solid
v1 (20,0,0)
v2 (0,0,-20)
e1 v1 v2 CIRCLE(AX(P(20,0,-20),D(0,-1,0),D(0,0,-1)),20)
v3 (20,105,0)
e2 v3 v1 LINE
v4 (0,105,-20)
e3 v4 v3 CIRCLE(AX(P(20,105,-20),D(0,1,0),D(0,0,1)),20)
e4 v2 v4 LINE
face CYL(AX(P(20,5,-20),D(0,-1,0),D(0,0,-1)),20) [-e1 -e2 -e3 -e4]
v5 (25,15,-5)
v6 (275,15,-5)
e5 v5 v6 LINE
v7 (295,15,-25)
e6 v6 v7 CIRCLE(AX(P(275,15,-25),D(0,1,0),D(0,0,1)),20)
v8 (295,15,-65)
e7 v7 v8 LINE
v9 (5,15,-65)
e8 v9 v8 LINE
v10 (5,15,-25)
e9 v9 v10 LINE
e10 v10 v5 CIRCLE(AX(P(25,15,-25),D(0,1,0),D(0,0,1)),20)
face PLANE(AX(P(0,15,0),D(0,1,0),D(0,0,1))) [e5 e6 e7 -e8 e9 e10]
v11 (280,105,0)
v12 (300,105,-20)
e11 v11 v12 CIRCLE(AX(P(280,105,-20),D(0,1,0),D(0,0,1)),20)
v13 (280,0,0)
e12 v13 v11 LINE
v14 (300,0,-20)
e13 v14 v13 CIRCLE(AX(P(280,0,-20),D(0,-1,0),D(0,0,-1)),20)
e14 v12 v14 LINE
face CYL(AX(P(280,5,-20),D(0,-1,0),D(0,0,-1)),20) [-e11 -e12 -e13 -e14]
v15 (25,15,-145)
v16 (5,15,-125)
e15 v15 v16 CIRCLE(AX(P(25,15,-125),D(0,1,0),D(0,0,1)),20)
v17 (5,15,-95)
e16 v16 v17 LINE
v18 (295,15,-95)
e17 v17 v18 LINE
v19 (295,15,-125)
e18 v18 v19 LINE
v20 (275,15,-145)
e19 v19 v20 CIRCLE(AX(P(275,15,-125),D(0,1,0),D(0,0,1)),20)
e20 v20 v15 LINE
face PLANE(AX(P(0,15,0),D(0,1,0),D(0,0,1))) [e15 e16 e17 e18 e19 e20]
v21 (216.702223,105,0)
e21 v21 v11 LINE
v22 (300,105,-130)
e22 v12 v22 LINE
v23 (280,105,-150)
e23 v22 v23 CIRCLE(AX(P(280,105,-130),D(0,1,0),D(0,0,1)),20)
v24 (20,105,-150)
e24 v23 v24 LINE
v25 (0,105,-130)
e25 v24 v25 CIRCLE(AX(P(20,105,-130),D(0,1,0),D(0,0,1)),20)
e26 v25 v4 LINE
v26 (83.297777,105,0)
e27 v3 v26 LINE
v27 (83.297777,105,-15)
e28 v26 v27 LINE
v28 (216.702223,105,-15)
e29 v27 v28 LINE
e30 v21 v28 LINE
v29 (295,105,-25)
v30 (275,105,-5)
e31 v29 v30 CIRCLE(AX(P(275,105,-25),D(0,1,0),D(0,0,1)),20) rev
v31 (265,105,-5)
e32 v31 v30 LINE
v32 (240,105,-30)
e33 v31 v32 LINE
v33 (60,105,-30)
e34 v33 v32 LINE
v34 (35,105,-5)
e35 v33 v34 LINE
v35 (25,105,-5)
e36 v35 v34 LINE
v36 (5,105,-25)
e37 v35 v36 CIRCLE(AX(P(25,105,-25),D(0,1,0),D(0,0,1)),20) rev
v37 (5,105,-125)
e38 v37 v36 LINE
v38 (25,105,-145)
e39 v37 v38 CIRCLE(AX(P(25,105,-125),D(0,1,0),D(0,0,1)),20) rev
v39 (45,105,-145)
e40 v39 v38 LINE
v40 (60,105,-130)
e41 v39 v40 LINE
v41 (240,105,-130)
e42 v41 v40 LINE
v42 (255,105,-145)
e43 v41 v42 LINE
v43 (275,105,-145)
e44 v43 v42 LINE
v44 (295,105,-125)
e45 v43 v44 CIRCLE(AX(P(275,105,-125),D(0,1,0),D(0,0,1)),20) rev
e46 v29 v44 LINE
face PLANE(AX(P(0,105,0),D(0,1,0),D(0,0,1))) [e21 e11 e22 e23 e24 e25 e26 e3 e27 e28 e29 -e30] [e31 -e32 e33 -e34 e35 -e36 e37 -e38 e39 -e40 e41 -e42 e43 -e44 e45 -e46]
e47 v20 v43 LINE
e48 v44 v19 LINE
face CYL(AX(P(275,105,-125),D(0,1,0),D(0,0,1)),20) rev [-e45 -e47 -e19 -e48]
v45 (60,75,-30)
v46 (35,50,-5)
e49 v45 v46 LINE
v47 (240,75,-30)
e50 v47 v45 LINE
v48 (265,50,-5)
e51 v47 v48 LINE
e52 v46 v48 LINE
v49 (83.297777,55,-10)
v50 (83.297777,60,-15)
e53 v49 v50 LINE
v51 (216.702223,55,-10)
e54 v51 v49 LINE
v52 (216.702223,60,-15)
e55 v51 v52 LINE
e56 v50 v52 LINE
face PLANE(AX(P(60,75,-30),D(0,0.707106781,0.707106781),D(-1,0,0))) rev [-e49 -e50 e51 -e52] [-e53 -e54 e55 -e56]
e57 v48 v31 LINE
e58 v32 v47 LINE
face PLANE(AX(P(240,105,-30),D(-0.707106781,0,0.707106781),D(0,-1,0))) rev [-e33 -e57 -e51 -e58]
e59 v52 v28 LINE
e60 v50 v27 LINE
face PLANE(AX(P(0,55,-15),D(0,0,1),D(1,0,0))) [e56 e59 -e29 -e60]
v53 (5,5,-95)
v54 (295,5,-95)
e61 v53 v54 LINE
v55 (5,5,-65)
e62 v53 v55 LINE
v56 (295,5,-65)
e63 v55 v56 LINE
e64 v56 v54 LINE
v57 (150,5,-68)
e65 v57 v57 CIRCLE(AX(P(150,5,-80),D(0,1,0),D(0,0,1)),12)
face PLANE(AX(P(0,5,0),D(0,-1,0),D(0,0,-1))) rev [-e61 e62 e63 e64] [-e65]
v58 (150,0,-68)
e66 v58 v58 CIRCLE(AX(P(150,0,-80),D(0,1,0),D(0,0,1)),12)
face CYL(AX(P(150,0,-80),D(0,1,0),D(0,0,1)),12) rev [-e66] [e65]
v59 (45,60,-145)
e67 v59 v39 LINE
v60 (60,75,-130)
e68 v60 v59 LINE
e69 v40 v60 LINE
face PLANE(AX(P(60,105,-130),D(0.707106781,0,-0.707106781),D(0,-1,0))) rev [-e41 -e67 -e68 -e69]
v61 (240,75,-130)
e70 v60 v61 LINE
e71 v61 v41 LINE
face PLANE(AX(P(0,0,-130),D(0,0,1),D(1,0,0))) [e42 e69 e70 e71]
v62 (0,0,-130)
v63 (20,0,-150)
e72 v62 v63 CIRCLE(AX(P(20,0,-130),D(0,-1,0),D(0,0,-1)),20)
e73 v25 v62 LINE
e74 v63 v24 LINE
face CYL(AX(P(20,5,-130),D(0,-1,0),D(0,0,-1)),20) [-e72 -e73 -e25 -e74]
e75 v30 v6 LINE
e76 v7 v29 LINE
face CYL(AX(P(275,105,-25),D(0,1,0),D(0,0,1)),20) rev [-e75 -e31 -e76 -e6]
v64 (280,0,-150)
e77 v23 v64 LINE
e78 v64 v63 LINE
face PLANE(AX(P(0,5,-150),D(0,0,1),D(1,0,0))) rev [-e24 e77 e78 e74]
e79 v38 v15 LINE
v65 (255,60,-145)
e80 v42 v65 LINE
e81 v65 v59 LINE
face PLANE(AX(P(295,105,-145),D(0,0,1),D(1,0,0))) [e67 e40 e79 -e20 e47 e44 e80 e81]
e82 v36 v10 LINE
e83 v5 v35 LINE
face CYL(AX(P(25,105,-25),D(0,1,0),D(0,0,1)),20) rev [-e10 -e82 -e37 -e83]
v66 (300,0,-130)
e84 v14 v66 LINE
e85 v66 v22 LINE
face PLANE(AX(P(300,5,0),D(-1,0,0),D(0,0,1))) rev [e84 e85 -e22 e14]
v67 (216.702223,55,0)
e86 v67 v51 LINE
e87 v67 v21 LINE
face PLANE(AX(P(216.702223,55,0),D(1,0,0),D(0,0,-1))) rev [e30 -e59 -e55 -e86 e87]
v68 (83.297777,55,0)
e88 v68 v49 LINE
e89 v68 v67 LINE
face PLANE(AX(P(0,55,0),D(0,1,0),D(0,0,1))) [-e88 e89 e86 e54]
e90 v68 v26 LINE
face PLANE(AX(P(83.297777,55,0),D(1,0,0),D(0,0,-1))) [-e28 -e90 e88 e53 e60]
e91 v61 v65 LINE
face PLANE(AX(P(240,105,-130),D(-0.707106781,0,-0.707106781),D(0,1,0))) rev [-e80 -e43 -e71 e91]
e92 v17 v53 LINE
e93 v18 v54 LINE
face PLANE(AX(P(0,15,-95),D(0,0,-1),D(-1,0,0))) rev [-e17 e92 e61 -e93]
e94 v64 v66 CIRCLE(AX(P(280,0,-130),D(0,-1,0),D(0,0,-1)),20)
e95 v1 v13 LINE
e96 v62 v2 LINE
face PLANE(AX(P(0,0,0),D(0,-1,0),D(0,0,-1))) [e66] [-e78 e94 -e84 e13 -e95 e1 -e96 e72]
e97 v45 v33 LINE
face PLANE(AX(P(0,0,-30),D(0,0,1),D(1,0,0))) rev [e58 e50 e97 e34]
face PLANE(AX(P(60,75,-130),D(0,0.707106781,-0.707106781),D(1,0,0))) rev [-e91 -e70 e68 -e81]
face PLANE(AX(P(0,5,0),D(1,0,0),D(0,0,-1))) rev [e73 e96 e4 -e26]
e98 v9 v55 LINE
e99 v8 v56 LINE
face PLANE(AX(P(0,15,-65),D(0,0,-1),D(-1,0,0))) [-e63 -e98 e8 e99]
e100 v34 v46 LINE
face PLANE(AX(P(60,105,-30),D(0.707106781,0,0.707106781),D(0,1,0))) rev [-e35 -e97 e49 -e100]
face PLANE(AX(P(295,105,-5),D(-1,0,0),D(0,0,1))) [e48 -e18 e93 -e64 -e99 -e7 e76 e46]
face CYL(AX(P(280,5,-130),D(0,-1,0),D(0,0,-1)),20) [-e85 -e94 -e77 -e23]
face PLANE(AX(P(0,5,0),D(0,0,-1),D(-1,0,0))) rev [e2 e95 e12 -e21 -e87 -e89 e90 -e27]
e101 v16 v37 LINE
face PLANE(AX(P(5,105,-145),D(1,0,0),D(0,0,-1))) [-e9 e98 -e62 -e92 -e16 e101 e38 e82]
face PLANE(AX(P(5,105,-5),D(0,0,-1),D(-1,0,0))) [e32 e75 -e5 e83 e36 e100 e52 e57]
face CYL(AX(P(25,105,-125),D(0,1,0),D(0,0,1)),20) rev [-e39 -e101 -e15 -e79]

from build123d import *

# Parameters (mm, degrees)
SKETCH1_W           = 300
SKETCH1_H           = 150
BOSS_EXTRUDE1_DEPTH = 5
SKETCH3_W           = 300
SKETCH3_H           = 150
SKETCH3_W_2         = 290
SKETCH3_H_2         = 140
BOSS_EXTRUDE2_DEPTH = 100
SKETCH4_W           = 290
SKETCH4_H           = 50
SKETCH4_H_2         = 60
BOSS_EXTRUDE3_DEPTH = 10
SKETCH7_R           = 12
CUT_EXTRUDE1_DEPTH  = 351
FILLET1_R           = 20
SKETCH10_W          = 180
SKETCH10_H          = 30
BOSS_EXTRUDE4_DEPTH = 15
SKETCH11_W          = 180
SKETCH11_H          = 30
BOSS_EXTRUDE5_DEPTH = 25
CHAMFER2_SIZE       = 15
CHAMFER3_SIZE       = 25
SKETCH12_W          = 133.404446906
SKETCH12_H          = 15
CUT_EXTRUDE2_DEPTH  = 50


with BuildPart() as part:
    # Sketch1 → Boss-Extrude1 (new body)
    with BuildSketch(Plane(origin=(0, 0, 0), x_dir=(1, 0, 0), z_dir=(0, 1, 0))):
        with Locations((150, 75)):
            Rectangle(SKETCH1_W, SKETCH1_H)
    extrude(amount=BOSS_EXTRUDE1_DEPTH)

    # Sketch3 → Boss-Extrude2 (add)
    with BuildSketch(Plane(origin=(0, 5, 0), x_dir=(1, 0, 0), z_dir=(0, 1, 0))):
        with Locations((150, 75)):
            Rectangle(SKETCH3_W, SKETCH3_H)
        with Locations((150, 75)):
            Rectangle(SKETCH3_W_2, SKETCH3_H_2, mode=Mode.SUBTRACT)
    extrude(amount=BOSS_EXTRUDE2_DEPTH)

    # Sketch4 → Boss-Extrude3 (add)
    with BuildSketch(Plane(origin=(0, 5, 0), x_dir=(1, 0, 0), z_dir=(0, 1, 0))):
        with Locations((150, 120)):
            Rectangle(SKETCH4_W, SKETCH4_H)
        with Locations((150, 35)):
            Rectangle(SKETCH4_W, SKETCH4_H_2)
    extrude(amount=BOSS_EXTRUDE3_DEPTH)

    # Sketch7 → Cut-Extrude1 (cut, through all)
    with BuildSketch(Plane(origin=(0, 5, 0), x_dir=(1, 0, 0), z_dir=(0, 1, 0))):
        with Locations(Location((150, 80, 0), (0, 0, 270))):
            Circle(SKETCH7_R)
    extrude(amount=-CUT_EXTRUDE1_DEPTH, mode=Mode.SUBTRACT)

    # Fillet1
    fillet1_edges = [part.edges().sort_by_distance(p)[0] for p in [
        (5, 60, -145),
        (5, 60, -5),
        (295, 60, -5),
        (295, 60, -145),
        (0, 52.5, -150),
        (300, 52.5, -150),
        (300, 52.5, 0),
        (0, 52.5, 0),
    ]]
    fillet(fillet1_edges, radius=FILLET1_R)

    # Sketch10 → Boss-Extrude4 (add)
    with BuildSketch(Plane.XY.offset(-145)):
        with Locations((150, 90)):
            Rectangle(SKETCH10_W, SKETCH10_H)
    extrude(amount=BOSS_EXTRUDE4_DEPTH)

    # Sketch11 → Boss-Extrude5 (add)
    with BuildSketch(Plane(origin=(0, 0, -5), x_dir=(-1, 0, 0), z_dir=(0, 0, -1))):
        with Locations((-150, 90)):
            Rectangle(SKETCH11_W, SKETCH11_H)
    extrude(amount=BOSS_EXTRUDE5_DEPTH)

    # Chamfer2
    chamfer2_edges = [part.edges().sort_by_distance(p)[0] for p in [
        (240, 90, -145),
        (150, 75, -145),
        (60, 90, -145),
    ]]
    chamfer(chamfer2_edges, length=CHAMFER2_SIZE - 0.0001)  # a hair under: the kernel refuses the full size

    # Chamfer3
    chamfer3_edges = [part.edges().sort_by_distance(p)[0] for p in [
        (60, 90, -5),
        (150, 75, -5),
        (240, 90, -5),
    ]]
    chamfer(chamfer3_edges, length=CHAMFER3_SIZE - 0.0001)  # a hair under: the kernel refuses the full size

    # Sketch12 → Cut-Extrude2 (cut)
    with BuildSketch(Plane(origin=(0, 105, 0), x_dir=(1, 0, 0), z_dir=(0, 1, 0))):
        with Locations((150, 7.5)):
            Rectangle(SKETCH12_W, SKETCH12_H)
    extrude(amount=-CUT_EXTRUDE2_DEPTH, mode=Mode.SUBTRACT)


solid = part.part
